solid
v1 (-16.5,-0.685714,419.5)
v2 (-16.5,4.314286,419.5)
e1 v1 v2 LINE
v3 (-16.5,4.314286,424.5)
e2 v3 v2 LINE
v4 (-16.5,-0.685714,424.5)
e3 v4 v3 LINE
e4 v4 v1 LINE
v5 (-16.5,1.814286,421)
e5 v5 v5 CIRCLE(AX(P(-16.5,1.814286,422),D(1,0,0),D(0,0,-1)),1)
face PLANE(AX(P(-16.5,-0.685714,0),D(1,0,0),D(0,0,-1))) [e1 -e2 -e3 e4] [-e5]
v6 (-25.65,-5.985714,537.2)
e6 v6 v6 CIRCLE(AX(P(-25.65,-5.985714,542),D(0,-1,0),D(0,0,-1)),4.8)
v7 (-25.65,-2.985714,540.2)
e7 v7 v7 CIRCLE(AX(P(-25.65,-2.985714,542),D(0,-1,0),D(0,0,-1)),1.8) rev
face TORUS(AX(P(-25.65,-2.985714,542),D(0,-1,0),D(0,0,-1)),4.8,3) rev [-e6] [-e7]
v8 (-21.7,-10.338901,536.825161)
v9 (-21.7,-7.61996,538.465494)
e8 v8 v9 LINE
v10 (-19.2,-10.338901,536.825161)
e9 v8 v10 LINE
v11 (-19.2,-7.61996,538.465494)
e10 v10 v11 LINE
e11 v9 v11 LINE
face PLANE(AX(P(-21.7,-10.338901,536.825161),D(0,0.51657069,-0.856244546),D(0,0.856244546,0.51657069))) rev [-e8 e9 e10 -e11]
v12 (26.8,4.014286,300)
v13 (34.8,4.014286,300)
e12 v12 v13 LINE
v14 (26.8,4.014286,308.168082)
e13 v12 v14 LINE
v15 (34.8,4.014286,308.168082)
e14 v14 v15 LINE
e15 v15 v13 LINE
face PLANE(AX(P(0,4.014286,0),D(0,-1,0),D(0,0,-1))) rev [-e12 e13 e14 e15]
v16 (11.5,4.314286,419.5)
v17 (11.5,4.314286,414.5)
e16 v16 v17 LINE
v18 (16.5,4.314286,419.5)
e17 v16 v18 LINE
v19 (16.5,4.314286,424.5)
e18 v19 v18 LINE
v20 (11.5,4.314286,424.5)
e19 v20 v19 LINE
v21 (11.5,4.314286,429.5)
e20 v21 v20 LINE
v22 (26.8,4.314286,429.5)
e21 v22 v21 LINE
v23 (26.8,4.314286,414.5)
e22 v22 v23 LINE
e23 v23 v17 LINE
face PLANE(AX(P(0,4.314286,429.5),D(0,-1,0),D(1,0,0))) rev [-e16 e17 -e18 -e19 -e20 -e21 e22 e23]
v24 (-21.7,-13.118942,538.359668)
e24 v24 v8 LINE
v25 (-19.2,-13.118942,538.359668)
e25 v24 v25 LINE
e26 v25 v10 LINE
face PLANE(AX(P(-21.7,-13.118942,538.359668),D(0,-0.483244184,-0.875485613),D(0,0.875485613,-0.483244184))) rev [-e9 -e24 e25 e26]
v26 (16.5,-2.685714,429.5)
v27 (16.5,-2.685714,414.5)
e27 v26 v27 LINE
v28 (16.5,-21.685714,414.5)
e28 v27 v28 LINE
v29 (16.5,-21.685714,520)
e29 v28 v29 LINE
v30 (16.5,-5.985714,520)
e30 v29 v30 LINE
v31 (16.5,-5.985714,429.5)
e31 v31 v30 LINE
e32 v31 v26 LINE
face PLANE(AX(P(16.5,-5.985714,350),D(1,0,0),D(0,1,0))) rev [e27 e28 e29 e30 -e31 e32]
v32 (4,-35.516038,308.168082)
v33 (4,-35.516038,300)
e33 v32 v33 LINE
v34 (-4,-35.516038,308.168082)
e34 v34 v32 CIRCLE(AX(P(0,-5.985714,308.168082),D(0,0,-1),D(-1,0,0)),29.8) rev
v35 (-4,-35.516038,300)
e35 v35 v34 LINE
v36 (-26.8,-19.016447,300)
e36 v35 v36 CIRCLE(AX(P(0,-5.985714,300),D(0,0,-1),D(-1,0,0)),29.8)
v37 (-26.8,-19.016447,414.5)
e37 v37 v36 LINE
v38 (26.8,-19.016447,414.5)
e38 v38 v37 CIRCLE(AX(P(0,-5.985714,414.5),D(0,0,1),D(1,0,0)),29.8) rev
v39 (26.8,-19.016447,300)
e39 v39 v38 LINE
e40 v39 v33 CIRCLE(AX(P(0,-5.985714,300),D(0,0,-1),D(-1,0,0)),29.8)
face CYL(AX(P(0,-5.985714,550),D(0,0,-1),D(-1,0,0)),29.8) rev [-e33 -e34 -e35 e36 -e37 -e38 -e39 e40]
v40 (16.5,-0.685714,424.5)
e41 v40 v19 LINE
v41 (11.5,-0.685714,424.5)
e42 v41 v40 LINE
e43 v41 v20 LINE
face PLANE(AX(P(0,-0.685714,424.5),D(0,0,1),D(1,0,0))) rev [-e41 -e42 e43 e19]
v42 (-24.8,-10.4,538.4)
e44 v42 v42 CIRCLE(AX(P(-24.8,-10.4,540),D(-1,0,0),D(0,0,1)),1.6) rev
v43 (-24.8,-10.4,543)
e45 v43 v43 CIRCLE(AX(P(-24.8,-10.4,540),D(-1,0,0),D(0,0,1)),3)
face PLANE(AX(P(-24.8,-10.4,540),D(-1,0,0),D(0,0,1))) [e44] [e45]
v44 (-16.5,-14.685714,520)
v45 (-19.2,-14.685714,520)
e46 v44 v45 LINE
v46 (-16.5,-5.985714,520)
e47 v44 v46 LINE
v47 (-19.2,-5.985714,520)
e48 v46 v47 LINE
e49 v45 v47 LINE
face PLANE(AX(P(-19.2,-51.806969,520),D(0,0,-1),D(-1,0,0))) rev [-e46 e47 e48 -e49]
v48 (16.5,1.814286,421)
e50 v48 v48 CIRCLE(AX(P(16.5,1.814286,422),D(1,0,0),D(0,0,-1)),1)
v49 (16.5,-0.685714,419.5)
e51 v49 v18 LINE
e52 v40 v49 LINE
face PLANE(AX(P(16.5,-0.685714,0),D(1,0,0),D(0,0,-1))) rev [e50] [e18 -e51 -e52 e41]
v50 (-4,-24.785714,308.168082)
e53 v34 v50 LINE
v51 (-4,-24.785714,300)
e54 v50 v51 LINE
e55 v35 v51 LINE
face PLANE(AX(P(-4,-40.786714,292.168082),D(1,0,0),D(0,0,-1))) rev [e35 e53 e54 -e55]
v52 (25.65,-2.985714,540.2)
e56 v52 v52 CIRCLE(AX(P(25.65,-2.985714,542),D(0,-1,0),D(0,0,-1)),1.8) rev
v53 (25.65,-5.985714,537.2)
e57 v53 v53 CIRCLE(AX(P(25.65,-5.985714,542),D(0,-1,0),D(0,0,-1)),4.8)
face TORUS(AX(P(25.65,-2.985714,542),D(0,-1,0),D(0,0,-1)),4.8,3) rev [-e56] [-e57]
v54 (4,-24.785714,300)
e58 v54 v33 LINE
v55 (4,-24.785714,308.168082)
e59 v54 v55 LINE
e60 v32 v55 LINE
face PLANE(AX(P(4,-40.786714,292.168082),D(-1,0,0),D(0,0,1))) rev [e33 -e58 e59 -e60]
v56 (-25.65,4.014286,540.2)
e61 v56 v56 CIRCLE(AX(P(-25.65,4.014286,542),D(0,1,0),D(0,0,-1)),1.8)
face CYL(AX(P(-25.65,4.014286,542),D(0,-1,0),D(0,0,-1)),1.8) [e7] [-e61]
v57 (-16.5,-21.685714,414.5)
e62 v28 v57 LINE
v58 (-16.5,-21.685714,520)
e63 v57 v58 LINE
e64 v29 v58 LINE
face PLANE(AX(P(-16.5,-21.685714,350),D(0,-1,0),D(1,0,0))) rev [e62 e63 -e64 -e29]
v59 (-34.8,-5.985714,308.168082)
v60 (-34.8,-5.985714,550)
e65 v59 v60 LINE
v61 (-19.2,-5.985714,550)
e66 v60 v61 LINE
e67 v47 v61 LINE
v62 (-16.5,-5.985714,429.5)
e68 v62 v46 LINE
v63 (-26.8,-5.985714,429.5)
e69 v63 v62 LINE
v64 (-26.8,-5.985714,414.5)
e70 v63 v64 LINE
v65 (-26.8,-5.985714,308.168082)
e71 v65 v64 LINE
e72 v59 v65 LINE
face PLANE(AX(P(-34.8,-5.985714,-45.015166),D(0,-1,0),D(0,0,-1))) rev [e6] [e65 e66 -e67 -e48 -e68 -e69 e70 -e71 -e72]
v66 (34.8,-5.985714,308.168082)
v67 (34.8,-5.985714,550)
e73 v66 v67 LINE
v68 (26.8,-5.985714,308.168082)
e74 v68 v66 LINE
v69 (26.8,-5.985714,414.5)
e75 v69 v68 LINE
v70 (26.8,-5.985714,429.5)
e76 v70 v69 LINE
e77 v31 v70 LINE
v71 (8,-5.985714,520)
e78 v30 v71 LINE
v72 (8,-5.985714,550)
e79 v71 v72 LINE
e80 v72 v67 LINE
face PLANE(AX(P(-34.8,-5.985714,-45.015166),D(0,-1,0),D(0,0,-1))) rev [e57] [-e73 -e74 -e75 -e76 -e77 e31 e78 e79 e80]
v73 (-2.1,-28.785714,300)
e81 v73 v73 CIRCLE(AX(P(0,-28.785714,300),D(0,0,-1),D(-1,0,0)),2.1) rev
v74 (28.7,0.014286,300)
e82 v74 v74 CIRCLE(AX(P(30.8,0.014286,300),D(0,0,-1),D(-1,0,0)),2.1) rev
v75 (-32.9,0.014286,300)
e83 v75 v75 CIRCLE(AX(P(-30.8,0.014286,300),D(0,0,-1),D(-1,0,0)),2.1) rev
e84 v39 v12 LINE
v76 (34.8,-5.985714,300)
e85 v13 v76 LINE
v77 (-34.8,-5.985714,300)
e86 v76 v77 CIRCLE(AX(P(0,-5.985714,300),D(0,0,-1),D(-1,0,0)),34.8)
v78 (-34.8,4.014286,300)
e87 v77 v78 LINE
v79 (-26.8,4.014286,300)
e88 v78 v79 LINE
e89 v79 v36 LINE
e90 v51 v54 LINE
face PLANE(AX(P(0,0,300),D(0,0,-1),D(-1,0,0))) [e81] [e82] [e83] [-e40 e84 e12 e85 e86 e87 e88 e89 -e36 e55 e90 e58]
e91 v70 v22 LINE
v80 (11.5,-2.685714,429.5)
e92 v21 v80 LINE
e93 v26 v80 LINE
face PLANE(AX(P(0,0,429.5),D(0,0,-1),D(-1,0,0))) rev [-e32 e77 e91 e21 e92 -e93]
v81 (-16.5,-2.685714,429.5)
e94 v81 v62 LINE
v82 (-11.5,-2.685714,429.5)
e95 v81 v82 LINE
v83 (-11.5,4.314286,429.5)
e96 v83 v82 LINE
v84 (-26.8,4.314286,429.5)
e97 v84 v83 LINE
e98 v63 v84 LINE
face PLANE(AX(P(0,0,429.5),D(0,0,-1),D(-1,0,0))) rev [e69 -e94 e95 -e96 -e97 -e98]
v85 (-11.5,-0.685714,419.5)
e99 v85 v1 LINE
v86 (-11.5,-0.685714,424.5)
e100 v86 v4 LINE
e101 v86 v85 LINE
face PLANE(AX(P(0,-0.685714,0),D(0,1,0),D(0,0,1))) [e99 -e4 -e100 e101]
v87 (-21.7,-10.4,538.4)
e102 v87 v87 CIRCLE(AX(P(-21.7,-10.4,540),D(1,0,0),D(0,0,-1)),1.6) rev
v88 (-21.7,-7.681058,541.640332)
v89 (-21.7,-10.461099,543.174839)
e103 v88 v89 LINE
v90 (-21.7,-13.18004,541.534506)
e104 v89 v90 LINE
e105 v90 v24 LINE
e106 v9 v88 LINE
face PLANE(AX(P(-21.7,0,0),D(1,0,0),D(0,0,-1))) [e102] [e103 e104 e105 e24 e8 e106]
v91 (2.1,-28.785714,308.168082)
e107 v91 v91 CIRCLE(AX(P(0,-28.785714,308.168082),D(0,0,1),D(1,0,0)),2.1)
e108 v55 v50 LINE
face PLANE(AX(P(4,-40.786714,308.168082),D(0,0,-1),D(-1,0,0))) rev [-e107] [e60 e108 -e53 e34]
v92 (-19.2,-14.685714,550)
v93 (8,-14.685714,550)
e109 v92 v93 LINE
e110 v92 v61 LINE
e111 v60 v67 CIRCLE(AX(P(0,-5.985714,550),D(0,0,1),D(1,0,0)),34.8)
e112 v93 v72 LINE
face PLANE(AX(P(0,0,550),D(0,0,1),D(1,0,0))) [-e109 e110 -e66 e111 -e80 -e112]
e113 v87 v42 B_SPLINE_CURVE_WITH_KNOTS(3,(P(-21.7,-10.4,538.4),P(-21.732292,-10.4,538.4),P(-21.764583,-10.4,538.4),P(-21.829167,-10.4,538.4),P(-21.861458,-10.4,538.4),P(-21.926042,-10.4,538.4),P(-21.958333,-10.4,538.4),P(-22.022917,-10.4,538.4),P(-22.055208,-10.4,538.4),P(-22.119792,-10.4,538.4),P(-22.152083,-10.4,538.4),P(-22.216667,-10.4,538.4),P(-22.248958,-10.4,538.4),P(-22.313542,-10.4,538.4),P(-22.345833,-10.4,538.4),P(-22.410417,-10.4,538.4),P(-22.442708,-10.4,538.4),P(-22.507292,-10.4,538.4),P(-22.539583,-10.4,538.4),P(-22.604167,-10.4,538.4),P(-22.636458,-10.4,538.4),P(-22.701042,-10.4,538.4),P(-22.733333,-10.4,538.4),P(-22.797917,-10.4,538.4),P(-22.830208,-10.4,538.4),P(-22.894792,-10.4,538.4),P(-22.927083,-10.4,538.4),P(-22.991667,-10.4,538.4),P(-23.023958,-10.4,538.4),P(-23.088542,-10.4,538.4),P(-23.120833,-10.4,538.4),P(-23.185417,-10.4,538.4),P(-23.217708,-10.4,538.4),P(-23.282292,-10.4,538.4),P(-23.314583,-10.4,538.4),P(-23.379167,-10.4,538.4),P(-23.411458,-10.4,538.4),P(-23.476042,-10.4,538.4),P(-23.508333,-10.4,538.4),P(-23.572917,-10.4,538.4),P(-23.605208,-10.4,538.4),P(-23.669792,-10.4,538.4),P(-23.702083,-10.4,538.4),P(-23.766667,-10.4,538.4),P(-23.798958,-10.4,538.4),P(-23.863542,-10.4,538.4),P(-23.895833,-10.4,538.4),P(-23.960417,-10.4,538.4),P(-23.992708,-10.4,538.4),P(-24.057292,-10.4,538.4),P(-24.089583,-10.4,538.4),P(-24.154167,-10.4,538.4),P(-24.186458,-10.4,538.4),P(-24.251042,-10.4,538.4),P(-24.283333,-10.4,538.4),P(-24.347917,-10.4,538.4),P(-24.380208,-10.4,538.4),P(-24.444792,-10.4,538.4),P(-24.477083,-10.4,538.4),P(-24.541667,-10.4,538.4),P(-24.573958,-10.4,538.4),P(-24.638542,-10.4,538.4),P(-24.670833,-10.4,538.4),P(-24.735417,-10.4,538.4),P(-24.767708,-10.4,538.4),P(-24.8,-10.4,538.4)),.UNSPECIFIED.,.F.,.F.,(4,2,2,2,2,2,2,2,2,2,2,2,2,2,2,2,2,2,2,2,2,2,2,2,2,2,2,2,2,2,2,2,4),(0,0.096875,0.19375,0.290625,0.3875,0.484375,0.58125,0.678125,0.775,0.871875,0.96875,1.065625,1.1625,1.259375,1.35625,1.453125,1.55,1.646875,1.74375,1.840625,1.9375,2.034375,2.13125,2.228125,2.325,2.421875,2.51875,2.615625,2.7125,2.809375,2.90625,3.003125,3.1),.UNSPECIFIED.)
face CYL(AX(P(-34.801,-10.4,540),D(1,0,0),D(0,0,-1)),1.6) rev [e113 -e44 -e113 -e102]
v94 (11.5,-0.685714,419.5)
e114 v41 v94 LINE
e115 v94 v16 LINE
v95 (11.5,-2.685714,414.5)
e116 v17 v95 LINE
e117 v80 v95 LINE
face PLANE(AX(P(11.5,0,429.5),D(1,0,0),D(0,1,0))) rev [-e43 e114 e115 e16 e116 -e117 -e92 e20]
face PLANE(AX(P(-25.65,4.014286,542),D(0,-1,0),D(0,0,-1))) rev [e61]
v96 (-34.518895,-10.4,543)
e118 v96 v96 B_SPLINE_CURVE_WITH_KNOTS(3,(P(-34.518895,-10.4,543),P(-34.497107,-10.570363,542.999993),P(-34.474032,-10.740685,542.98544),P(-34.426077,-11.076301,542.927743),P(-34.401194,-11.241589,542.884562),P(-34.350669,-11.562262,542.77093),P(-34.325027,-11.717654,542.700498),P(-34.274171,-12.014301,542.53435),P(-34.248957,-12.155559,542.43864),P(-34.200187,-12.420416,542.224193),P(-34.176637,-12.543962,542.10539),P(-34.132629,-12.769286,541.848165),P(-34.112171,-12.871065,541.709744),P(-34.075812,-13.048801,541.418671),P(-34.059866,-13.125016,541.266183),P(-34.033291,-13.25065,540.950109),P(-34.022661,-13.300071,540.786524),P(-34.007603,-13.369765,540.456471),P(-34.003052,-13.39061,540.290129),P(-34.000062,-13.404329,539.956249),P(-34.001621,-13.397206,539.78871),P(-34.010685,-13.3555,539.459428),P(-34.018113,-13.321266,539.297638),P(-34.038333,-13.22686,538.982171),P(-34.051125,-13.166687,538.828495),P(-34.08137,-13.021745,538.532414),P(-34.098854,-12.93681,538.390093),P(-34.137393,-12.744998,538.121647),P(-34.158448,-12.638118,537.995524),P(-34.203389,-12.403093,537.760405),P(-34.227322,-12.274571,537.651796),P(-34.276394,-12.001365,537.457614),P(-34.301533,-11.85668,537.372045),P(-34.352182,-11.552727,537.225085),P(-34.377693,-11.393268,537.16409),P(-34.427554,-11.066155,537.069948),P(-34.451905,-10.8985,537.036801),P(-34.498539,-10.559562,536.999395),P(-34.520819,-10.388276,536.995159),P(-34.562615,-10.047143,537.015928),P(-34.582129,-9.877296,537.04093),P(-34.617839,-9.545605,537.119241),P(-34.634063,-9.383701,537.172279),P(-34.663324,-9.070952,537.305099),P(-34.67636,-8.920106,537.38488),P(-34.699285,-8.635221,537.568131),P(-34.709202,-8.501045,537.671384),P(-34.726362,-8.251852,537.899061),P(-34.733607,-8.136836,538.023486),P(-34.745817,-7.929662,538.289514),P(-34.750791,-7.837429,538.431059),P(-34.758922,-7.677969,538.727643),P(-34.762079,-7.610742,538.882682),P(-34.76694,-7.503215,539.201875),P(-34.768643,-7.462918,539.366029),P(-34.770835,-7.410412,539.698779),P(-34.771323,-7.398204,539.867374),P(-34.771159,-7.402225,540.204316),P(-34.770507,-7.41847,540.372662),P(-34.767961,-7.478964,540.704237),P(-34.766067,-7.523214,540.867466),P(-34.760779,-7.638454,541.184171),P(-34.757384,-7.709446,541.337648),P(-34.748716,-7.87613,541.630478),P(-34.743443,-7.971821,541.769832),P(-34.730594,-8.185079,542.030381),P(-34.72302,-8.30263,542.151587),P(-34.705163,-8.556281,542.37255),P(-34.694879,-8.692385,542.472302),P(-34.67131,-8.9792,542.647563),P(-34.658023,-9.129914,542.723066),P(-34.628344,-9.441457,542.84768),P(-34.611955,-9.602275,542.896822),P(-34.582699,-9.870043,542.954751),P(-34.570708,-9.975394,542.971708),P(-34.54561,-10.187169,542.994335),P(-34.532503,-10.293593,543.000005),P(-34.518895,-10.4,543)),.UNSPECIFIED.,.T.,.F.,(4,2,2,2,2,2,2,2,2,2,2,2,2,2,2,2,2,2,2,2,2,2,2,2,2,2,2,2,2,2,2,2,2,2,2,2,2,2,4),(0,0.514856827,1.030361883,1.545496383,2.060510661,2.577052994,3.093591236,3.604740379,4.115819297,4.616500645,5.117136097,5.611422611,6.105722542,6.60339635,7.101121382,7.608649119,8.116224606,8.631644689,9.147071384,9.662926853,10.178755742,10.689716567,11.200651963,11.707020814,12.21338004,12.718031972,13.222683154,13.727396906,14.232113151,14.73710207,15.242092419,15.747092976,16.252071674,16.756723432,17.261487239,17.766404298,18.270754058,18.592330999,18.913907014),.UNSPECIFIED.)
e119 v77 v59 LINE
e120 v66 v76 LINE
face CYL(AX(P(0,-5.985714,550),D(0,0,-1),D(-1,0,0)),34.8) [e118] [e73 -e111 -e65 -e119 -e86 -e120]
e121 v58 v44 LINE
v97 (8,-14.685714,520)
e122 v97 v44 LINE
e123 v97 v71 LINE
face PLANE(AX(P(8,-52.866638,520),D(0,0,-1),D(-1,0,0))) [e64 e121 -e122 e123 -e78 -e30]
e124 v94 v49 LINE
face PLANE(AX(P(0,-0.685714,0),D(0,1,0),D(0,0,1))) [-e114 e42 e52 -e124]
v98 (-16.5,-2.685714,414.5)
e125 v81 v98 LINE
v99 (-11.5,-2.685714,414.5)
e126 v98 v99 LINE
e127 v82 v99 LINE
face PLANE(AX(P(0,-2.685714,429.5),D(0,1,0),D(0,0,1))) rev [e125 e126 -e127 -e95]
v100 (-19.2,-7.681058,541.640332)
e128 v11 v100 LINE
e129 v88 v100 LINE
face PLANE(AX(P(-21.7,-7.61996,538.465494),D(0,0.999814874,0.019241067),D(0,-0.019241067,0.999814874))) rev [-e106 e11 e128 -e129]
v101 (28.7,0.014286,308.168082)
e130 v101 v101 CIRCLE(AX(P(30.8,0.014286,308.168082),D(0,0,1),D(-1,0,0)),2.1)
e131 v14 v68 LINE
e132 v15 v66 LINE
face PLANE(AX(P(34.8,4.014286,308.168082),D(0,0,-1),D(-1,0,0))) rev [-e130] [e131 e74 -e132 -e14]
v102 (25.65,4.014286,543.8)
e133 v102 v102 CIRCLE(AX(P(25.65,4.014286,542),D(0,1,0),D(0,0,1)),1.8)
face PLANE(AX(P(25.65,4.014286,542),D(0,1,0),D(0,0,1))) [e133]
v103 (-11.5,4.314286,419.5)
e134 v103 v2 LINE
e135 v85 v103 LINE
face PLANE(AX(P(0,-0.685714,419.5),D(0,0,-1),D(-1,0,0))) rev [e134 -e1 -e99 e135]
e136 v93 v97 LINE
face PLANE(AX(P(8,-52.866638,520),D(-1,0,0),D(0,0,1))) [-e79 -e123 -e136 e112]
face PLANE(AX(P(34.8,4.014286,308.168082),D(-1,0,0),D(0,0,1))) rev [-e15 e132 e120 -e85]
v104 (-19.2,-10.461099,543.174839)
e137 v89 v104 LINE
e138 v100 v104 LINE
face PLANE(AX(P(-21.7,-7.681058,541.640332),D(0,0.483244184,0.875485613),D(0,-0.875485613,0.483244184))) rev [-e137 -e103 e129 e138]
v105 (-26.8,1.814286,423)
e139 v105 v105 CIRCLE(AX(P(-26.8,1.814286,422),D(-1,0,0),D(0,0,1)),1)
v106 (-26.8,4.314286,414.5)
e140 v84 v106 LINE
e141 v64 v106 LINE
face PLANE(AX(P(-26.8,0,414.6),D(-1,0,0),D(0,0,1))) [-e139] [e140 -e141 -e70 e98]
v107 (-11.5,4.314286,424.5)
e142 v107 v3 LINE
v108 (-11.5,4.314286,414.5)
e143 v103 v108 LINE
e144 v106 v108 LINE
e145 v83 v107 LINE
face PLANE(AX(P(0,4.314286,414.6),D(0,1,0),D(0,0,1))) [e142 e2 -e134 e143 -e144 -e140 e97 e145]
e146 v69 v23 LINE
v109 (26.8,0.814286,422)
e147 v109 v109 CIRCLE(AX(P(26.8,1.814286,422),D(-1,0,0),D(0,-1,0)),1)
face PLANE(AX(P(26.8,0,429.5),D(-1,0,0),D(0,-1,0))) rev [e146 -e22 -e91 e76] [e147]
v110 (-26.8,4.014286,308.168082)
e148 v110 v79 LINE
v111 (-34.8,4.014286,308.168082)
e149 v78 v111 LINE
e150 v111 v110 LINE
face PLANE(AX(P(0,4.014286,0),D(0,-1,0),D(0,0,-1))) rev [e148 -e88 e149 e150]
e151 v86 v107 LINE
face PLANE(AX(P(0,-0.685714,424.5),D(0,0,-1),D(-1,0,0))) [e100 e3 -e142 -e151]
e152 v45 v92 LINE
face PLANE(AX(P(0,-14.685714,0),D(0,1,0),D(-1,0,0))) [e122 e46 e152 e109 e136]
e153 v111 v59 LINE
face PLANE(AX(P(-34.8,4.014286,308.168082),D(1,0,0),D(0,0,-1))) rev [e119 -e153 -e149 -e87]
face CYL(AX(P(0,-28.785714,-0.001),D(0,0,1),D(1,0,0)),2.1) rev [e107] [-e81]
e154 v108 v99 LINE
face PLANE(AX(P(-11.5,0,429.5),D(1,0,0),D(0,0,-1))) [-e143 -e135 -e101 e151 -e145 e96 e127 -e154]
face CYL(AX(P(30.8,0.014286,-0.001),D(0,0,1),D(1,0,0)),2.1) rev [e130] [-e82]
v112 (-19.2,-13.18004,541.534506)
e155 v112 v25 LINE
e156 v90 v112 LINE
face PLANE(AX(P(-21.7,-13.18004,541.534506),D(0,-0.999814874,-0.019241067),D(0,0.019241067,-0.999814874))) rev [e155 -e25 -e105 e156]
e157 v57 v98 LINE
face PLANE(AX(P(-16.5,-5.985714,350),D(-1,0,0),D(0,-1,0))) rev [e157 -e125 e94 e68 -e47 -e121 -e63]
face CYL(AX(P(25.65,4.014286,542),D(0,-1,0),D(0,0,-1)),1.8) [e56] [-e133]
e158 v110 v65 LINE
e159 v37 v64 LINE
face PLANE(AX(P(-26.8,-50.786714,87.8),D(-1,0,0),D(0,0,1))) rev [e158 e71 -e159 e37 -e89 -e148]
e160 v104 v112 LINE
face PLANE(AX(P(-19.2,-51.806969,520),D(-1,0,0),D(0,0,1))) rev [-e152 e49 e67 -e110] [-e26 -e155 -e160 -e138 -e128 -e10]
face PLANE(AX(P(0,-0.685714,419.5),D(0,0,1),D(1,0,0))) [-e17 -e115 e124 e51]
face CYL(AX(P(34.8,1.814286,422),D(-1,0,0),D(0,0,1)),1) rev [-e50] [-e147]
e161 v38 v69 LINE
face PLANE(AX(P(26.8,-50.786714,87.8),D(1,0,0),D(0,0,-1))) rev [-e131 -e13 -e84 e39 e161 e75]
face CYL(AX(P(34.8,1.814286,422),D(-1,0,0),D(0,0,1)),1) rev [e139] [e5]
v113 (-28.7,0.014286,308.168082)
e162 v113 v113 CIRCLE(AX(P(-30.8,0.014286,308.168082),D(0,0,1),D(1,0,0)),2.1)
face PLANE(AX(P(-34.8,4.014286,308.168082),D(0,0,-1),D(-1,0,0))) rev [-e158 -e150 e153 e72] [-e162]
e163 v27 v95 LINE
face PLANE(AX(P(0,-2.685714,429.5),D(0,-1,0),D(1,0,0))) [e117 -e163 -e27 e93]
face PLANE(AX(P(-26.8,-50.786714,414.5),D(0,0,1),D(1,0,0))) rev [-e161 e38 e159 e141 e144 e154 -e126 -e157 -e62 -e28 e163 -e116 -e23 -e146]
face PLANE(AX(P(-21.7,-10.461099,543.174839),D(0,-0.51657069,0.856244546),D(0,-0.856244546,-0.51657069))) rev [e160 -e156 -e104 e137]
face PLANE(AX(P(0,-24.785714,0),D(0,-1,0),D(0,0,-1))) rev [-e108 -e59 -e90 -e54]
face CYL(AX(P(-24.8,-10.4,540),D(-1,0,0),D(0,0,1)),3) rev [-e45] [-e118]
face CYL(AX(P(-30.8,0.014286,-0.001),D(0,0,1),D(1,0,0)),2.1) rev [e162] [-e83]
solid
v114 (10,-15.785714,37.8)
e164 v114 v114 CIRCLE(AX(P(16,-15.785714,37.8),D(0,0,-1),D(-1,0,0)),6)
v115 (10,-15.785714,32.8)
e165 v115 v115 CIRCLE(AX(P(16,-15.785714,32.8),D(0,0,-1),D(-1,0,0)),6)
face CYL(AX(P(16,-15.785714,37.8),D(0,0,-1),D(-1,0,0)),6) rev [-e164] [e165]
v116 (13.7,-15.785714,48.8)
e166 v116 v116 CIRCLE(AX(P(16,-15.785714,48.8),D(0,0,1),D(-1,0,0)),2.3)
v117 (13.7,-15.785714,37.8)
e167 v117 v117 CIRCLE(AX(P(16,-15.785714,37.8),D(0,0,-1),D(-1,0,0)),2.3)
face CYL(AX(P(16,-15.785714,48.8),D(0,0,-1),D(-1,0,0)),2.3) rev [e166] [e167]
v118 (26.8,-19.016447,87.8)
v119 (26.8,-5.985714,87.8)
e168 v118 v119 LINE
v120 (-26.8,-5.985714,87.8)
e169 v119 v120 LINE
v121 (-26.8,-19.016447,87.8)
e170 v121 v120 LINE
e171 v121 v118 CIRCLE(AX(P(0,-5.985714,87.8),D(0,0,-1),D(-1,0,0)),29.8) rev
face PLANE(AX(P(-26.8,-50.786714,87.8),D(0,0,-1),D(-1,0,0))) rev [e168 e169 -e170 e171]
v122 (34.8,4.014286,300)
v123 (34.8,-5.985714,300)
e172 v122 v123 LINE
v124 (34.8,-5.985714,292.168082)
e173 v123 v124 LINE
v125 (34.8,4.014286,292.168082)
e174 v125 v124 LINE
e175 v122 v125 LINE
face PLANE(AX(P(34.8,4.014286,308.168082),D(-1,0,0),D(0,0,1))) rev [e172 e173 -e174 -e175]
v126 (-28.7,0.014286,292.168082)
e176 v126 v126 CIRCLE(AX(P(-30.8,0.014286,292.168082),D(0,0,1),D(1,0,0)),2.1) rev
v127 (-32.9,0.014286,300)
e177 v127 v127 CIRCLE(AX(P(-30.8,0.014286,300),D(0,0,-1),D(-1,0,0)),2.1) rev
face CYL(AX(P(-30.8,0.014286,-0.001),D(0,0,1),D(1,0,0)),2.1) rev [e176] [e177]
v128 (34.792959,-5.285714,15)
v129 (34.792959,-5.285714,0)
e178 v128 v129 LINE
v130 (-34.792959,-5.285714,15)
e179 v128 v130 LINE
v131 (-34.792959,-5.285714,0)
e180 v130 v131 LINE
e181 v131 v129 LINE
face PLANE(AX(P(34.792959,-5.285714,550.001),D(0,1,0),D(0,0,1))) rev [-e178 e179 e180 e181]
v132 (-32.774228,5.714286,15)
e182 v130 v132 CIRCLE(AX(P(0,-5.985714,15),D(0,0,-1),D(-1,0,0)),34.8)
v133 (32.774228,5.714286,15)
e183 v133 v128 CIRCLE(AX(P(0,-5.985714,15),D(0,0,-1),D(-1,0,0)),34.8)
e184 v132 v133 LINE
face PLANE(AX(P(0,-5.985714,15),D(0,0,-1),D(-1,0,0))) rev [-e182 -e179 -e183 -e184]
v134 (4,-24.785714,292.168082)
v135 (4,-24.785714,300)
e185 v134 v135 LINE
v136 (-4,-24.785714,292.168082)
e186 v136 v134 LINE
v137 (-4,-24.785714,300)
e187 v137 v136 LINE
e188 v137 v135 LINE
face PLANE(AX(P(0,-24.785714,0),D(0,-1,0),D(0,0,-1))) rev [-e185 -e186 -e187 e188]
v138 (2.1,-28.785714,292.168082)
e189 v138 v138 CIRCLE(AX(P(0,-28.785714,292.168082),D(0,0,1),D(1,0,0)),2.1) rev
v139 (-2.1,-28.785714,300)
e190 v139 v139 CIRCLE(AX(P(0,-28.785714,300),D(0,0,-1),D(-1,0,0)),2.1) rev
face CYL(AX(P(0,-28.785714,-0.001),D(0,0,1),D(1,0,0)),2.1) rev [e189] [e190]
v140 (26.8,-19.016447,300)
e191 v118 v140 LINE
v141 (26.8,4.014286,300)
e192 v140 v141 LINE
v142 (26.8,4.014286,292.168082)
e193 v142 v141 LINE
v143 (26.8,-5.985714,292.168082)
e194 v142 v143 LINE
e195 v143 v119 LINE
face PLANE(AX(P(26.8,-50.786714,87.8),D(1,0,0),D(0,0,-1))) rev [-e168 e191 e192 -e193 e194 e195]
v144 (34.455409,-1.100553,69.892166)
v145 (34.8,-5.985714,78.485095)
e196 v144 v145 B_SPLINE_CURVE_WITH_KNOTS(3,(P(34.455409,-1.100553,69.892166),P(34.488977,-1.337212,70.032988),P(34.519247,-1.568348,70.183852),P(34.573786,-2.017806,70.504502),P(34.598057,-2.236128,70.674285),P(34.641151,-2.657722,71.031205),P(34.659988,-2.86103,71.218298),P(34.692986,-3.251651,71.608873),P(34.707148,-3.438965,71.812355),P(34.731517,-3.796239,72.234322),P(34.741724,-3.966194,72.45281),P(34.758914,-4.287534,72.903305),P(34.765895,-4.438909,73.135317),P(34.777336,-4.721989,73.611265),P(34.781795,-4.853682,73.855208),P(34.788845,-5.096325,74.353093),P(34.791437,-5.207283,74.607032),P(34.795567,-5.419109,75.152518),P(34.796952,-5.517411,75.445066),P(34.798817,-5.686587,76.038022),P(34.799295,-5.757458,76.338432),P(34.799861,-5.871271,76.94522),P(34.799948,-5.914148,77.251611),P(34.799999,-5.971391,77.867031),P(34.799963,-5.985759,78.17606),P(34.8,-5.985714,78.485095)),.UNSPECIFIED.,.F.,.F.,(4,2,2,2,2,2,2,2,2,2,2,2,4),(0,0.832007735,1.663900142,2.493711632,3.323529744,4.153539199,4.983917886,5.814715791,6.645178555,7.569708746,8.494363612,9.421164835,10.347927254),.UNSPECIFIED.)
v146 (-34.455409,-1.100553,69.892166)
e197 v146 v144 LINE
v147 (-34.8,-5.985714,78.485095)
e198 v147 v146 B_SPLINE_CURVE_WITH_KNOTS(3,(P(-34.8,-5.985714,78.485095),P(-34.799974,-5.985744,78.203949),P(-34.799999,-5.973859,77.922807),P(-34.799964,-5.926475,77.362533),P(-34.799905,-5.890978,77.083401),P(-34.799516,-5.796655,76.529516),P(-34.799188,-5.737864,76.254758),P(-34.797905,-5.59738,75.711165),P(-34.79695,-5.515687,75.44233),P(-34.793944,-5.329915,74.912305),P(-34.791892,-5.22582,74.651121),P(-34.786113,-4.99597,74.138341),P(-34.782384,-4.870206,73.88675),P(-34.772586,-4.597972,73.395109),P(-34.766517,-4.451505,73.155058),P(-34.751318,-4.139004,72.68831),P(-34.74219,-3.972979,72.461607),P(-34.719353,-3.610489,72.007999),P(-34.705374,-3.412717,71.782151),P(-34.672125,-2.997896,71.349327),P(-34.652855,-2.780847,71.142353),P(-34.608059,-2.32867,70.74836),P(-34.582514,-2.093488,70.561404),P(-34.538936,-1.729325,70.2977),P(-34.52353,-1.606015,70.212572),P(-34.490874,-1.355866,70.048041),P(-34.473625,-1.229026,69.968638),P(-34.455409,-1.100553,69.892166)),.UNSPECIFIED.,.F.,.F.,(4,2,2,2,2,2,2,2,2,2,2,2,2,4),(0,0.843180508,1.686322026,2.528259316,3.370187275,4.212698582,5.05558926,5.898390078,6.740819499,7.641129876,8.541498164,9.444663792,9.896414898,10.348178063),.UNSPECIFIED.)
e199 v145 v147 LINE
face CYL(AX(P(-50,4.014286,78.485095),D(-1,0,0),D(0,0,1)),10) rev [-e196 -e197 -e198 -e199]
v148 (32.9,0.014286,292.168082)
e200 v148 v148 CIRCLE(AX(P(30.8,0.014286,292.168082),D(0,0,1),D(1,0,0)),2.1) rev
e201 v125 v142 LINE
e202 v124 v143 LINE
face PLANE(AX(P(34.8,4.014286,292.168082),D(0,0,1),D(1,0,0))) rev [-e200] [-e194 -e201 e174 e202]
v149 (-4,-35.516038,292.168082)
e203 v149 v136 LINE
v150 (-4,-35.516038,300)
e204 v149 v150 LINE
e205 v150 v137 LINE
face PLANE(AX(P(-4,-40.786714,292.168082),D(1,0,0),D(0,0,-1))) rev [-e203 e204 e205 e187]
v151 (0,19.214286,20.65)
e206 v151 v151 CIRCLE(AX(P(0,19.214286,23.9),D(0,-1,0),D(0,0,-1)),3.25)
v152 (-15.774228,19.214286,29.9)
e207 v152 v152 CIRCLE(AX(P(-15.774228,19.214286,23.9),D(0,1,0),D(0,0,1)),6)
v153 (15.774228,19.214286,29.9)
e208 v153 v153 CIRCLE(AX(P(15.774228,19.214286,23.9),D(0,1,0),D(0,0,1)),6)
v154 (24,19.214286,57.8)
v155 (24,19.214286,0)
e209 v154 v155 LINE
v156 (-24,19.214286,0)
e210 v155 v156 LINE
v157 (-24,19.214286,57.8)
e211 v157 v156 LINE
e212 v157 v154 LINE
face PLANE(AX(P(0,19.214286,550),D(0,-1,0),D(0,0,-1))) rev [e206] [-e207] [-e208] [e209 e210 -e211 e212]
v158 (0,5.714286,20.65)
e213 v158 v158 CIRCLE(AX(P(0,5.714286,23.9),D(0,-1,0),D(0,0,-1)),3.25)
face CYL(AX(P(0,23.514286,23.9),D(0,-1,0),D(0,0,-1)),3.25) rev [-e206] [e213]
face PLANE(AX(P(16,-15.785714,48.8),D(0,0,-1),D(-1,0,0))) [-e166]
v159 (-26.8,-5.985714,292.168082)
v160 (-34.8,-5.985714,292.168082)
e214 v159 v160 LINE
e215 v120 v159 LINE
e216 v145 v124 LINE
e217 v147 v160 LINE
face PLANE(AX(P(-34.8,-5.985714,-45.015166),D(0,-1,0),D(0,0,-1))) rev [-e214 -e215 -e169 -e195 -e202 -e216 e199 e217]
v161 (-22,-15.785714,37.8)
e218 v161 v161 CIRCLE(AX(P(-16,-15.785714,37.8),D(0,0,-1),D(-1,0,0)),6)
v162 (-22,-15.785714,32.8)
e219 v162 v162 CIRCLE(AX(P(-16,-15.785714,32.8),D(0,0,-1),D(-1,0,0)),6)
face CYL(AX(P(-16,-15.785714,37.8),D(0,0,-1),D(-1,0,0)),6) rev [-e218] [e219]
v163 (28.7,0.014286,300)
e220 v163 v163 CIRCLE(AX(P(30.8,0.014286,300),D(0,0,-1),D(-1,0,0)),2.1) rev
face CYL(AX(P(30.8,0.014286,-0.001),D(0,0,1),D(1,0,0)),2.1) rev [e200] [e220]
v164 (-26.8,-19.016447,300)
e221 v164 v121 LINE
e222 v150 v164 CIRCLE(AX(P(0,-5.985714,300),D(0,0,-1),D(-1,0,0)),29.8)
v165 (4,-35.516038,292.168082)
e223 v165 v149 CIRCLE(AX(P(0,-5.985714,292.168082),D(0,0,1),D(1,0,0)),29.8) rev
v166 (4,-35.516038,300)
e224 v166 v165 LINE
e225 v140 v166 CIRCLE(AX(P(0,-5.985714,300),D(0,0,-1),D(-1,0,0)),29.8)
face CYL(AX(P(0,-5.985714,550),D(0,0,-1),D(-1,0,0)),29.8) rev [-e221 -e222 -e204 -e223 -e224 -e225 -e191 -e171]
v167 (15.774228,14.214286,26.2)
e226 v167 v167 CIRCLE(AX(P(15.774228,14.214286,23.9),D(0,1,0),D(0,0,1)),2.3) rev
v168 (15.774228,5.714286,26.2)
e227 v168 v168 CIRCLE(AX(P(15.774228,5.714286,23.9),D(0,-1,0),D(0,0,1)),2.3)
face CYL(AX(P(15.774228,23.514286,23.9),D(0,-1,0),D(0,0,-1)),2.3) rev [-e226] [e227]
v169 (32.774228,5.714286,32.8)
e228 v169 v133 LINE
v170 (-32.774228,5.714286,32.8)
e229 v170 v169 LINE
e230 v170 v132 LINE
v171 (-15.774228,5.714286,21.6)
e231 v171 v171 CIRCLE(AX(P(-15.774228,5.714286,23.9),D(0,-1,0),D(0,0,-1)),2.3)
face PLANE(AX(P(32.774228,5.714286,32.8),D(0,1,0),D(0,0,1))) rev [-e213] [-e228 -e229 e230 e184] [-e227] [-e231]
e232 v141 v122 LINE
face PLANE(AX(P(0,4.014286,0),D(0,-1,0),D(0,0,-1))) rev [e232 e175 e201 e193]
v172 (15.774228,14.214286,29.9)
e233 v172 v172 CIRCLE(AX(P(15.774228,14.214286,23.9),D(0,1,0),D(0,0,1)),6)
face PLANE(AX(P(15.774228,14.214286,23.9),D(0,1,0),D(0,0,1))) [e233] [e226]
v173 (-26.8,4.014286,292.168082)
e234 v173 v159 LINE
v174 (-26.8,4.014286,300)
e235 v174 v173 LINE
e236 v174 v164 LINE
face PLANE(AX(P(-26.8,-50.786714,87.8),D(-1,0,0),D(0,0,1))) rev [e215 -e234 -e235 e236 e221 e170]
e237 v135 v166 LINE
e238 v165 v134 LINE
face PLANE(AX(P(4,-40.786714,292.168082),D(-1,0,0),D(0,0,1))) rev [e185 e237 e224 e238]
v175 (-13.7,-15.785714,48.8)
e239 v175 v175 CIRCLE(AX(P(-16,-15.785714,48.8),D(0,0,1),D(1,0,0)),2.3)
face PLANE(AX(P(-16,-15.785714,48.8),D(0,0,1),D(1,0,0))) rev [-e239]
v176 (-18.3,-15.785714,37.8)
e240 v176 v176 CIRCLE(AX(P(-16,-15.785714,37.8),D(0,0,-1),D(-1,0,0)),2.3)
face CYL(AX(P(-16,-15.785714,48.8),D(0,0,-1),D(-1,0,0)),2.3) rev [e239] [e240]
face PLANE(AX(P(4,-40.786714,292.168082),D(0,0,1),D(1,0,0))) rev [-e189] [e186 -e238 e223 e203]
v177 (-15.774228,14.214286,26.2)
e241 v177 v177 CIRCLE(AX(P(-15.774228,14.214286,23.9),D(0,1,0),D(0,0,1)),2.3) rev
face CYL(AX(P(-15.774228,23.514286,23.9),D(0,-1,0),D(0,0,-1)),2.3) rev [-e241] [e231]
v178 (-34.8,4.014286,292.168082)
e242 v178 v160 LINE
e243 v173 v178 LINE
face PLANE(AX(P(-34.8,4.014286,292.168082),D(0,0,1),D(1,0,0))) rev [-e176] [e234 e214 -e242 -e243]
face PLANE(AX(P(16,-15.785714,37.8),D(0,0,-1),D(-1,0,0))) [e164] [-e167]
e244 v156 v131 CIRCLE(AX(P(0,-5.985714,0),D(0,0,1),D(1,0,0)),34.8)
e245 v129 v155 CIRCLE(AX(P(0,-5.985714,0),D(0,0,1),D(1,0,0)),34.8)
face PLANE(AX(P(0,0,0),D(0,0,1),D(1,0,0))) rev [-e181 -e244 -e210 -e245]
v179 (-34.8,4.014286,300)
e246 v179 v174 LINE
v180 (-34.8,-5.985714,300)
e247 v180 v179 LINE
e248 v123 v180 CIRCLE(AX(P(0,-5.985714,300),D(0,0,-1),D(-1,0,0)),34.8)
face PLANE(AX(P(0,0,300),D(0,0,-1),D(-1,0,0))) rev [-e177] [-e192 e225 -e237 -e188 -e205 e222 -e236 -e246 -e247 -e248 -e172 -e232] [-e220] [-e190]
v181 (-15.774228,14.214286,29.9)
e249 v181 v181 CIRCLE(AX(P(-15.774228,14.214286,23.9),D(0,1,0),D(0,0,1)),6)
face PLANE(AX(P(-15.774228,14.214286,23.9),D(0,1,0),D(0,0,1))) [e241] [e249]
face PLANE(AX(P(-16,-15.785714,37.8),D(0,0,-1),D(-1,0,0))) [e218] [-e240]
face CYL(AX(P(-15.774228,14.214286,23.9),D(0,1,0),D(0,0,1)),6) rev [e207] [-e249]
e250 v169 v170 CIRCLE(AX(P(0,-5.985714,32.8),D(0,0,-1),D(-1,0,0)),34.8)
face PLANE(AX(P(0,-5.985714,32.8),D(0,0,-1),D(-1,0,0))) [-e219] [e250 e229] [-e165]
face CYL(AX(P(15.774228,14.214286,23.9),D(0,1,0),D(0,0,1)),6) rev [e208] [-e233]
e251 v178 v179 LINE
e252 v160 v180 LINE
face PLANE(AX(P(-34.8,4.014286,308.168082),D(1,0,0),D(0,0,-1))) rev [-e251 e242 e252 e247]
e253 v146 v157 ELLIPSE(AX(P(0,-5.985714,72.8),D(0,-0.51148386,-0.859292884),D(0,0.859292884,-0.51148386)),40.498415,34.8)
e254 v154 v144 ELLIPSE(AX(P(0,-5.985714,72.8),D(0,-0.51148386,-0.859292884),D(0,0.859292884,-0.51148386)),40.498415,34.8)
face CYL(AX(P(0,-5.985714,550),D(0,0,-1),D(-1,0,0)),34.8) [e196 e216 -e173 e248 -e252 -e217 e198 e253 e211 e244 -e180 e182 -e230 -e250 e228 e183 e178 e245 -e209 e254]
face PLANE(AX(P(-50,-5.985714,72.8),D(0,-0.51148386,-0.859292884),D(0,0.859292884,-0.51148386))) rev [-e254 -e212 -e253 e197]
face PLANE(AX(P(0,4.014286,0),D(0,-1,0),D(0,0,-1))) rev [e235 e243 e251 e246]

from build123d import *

# Parameters (mm, degrees)
F_1000MM_DEPTH           = 550
F_45MM_46MM_DEPTH        = 17.8
CUT_EXTRUDE_2_REACH      = 554.607
SKETCH_4_R               = 3.25
SKETCH_4_R_2             = 2.3
F_6_5MM_5MM_DEPTH        = 17.8
SKETCH_10_R              = 2.3
DEEP16MM_DEPTH           = 16
SKETCH_16_R              = 6
F_5MM_DEPTH              = 5
SKETCH_17_R              = 6
F_5MM_2_DEPTH            = 5
CUT_EXTRUDE_START        = -477.2
CUT_EXTRUDE_7_DEPTH      = 477.2
F_69_6MM_DEPTH           = 50
FILLET_1_R               = 10
SKETCH_22_W              = 33
SKETCH_22_H              = 15.7
CUT_EXTRUDE_9_DEPTH      = 200
CUT_EXTRUDE_START_2      = 87.8
CUT_EXTRUDE_12_DEPTH     = 326.7
SKETCH5_W                = 10.3
SKETCH5_H                = 10.3
BOSS_EXTRUDE1_DEPTH      = 0.1
SKETCH11_W               = 2.7
SKETCH11_H               = 30
CUT_EXTRUDE5_DEPTH       = 15.7
SKETCH12_W               = 8.5
SKETCH12_H               = 30
BOSS_EXTRUDE2_DEPTH      = 15.7
SKETCH14_W               = 27.2
SKETCH14_H               = 30
BOSS_EXTRUDE3_DEPTH      = 7
SKETCH19_W               = 8
SKETCH19_H               = 16
BOSS_EXTRUDE5_DEPTH      = 10
CUT_EXTRUDE9_REACH       = 314.797
SKETCH20_R               = 2.1
BOSS_EXTRUDE7_REACH      = 554.854
BOSS_EXTRUDE7_END_RADIUS = 29.8
SKETCH22_W               = 8
SKETCH22_H               = 16
CUT_EXTRUDE10_REACH      = 314.797
SKETCH23_R               = 2.1
SKETCH_32_R              = 1.8
BOSS_EXTRUDE9_DEPTH      = 10
FILLET4_R                = 3
CUT_EXTRUDE11_REACH      = 556.148
CUT_EXTRUDE11_END_RADIUS = 34.8
SKETCH13_R               = 1.6
CUT_EXTRUDE12_DEPTH      = 2.5
SKETCH25_R               = 3
CUT_EXTRUDE13_DEPTH      = 10
SKETCH26_W               = 5
SKETCH26_H               = 7
BOSS_EXTRUDE10_DEPTH     = 15
SKETCH27_W               = 5
SKETCH27_H               = 5
CUT_EXTRUDE14_DEPTH      = 5
SKETCH28_R               = 1
CUT_EXTRUDE15_DEPTH      = 555.93966755


# Read off the part's stored shape, not the designer's step: 切除-拉伸12
with BuildPart() as part:
    # 草图1 → 1000mm (new body)
    with BuildSketch(Plane.XY):
        with BuildLine():
            Line((24, 19.214285714), (-24, 19.214285714))
            ThreePointArc((-24, 19.214285714), (0, -40.785714286), (24, 19.214285714))
        make_face()
    extrude(amount=F_1000MM_DEPTH)

    # 草图2 → 45mm到46mm (cut)
    with BuildSketch(Plane(origin=(0, 0, 15), x_dir=(-1, 0, 0), z_dir=(0, 0, -1))):
        with BuildLine():
            Line((-32.77422768, 5.714285714), (32.77422768, 5.714285714))
            ThreePointArc((32.77422768, 5.714285714), (0, -40.785714286), (-32.77422768, 5.714285714))
        make_face()
    extrude(amount=-F_45MM_46MM_DEPTH, mode=Mode.SUBTRACT)

    # 草图3 → 切除-拉伸2 (cut, up to next)
    with BuildSketch(Plane(origin=(0, 0, 0), x_dir=(-1, 0, 0), z_dir=(0, 0, -1)), mode=Mode.PRIVATE) as cut_extrude_2_sk1:
        with BuildLine():
            Line((-34.792959058, -5.285714286), (34.792959058, -5.285714286))
            ThreePointArc((34.792959058, -5.285714286), (0, -40.785714286), (-34.792959058, -5.285714286))
        make_face()
    cut_extrude_2_tool1 = extrude(cut_extrude_2_sk1.sketch, amount=-CUT_EXTRUDE_2_REACH, mode=Mode.PRIVATE) & part.part
    add(cut_extrude_2_tool1.solids().sort_by_distance((0, -20.377758, 0))[0], mode=Mode.SUBTRACT)

    # 草图4 → 6.5mm&5mm (cut)
    with BuildSketch(Plane.XZ.offset(-5.714285714)):
        with Locations(Location((0, 23.9, 0), (0, 0, 270))):
            Circle(SKETCH_4_R)
        with Locations(Location((-15.77422768, 23.9, 0), (0, 0, 270))):
            Circle(SKETCH_4_R_2)
        with Locations(Location((15.77422768, 23.9, 0), (0, 0, 270))):
            Circle(SKETCH_4_R_2)
    extrude(amount=-F_6_5MM_5MM_DEPTH, mode=Mode.SUBTRACT)

    # 草图10 → 圆孔deep16mm (cut)
    with BuildSketch(Plane.XY.offset(32.8)):
        with Locations((-16, -15.785714286)):
            Circle(SKETCH_10_R)
        with Locations(Location((16, -15.785714286, 0), (0, 0, 180))):
            Circle(SKETCH_10_R)
    extrude(amount=DEEP16MM_DEPTH, mode=Mode.SUBTRACT)

    # 草图16 → 5mm (cut)
    with BuildSketch(Plane(origin=(0, 19.214285714, 0), x_dir=(1, 0, 0), z_dir=(0, 1, 0))):
        with Locations(Location((-15.77422768, -23.9, 0), (0, 0, 270))):
            Circle(SKETCH_16_R)
        with Locations(Location((15.77422768, -23.9, 0), (0, 0, 270))):
            Circle(SKETCH_16_R)
    extrude(amount=-F_5MM_DEPTH, mode=Mode.SUBTRACT)

    # 草图17 → 5mm 2 (cut)
    with BuildSketch(Plane(origin=(0, 0, 32.8), x_dir=(-1, 0, 0), z_dir=(0, 0, -1))):
        with Locations((-16, -15.785714286)):
            Circle(SKETCH_17_R)
        with Locations((16, -15.785714286)):
            Circle(SKETCH_17_R)
    extrude(amount=-F_5MM_2_DEPTH, mode=Mode.SUBTRACT)

    # 草图19 → 切除-拉伸7 (cut)
    with BuildSketch(Plane.XY.offset(550).offset(CUT_EXTRUDE_START)):
        with BuildLine():
            Line((-34.8, -5.985714286), (34.8, -5.985714286))
            ThreePointArc((34.8, -5.985714286), (0, 28.814285714), (-34.8, -5.985714286))
        make_face()
    extrude(amount=CUT_EXTRUDE_7_DEPTH, mode=Mode.SUBTRACT)

    # 草图20 → 宽69.6mm (cut, symmetric)
    with BuildSketch(Plane(origin=(0, 0, 0), x_dir=(0, 0, -1), z_dir=(1, 0, 0))):
        Polygon((-72.8, -5.985714286), (-57.8, 19.214285714), (-72.8, 19.214285714), align=None)
    extrude(amount=F_69_6MM_DEPTH, both=True, mode=Mode.SUBTRACT)

    # 圆角1
    fillet_1_edges = [part.edges().sort_by_distance(p)[0] for p in [
        (0, -5.985714286, 72.8),
    ]]
    fillet(fillet_1_edges, radius=FILLET_1_R)

    # 草图22 → 切除-拉伸9 (cut)
    with BuildSketch(Plane.XY.offset(550)):
        with Locations((0, -13.835714286)):
            Rectangle(SKETCH_22_W, SKETCH_22_H)
    extrude(amount=-CUT_EXTRUDE_9_DEPTH, mode=Mode.SUBTRACT)

    # 切除-拉伸12 outline → 切除-拉伸12 (cut)
    with BuildSketch(Plane.XY.offset(CUT_EXTRUDE_START_2)):
        with BuildLine():
            Line((-26.8, -5.985714286), (-26.8, -19.016447189))
            ThreePointArc((-26.8, -19.016447189), (0, -35.785714286), (26.8, -19.016447189))
            Line((26.8, -19.016447189), (26.8, -5.985714286))
            Line((26.8, -5.985714286), (-26.8, -5.985714286))
        make_face()
    extrude(amount=CUT_EXTRUDE_12_DEPTH, mode=Mode.SUBTRACT)

    # Sketch5 → Boss-Extrude1 (add)
    with BuildSketch(Plane(origin=(0, 0, 414.5), x_dir=(-1, 0, 0), z_dir=(0, 0, -1))):
        with Locations((21.65, -0.835714286)):
            Rectangle(SKETCH5_W, SKETCH5_H)
    extrude(amount=-BOSS_EXTRUDE1_DEPTH)


with BuildPart() as body_2:
    # Split1: the piece on the far side of the plane
    add(part.part)
    split(bisect_by=Plane(origin=(0, 0, 300), x_dir=(-1, 0, 0), z_dir=(0, 0, -1)), keep=Keep.BOTTOM)

    # Sketch11 → Cut-Extrude5 (cut)
    with BuildSketch(Plane(origin=(0, -5.985714286, 0), x_dir=(1, 0, 0), z_dir=(0, 1, 0))):
        with Locations((-17.85, -535)):
            Rectangle(SKETCH11_W, SKETCH11_H)
    extrude(amount=-CUT_EXTRUDE5_DEPTH, mode=Mode.SUBTRACT)

    # Sketch12 → Boss-Extrude2 (add)
    with BuildSketch(Plane(origin=(0, -5.985714286, 0), x_dir=(1, 0, 0), z_dir=(0, 1, 0))):
        with Locations((12.25, -535)):
            Rectangle(SKETCH12_W, SKETCH12_H)
    extrude(amount=-BOSS_EXTRUDE2_DEPTH)

    # Sketch14 → Boss-Extrude3 (add)
    with BuildSketch(Plane(origin=(0, -21.685714286, 0), x_dir=(1, 0, 0), z_dir=(0, 1, 0))):
        with Locations((-5.6, -535)):
            Rectangle(SKETCH14_W, SKETCH14_H)
    extrude(amount=BOSS_EXTRUDE3_DEPTH)


with BuildPart() as part_1:
    add(part.part)

    # Split1
    split(bisect_by=Plane(origin=(0, 0, 300), x_dir=(-1, 0, 0), z_dir=(0, 0, -1)), keep=Keep.TOP)

    add(body_2.part)  # Boss-Extrude5 merges body 2
    # Sketch19 → Boss-Extrude5 (add)
    with BuildSketch(Plane(origin=(0, -5.985714286, 0), x_dir=(1, 0, 0), z_dir=(0, 1, 0))):
        with Locations((-30.8, -300.168081581)):
            Rectangle(SKETCH19_W, SKETCH19_H)
        with Locations((30.8, -300.168081581)):
            Rectangle(SKETCH19_W, SKETCH19_H)
    extrude(amount=BOSS_EXTRUDE5_DEPTH)

    # Sketch20 → Cut-Extrude9 (cut, up to next)
    with BuildSketch(Plane.XY.offset(308.168081581), mode=Mode.PRIVATE) as cut_extrude9_sk1:
        with Locations((-30.8, 0.014285714)):
            Circle(SKETCH20_R)
    cut_extrude9_tool1 = extrude(cut_extrude9_sk1.sketch, amount=-CUT_EXTRUDE9_REACH, mode=Mode.PRIVATE) & part_1.part
    # Sketch20 → Cut-Extrude9 (cut, up to next)
    with BuildSketch(Plane.XY.offset(308.168081581), mode=Mode.PRIVATE) as cut_extrude9_sk2:
        with Locations((30.8, 0.014285714)):
            Circle(SKETCH20_R)
    cut_extrude9_tool2 = extrude(cut_extrude9_sk2.sketch, amount=-CUT_EXTRUDE9_REACH, mode=Mode.PRIVATE) & part_1.part
    add(cut_extrude9_tool1.solids().sort_by_distance((-30.8, 0.014286, 308.168082))[0], mode=Mode.SUBTRACT)
    add(cut_extrude9_tool2.solids().sort_by_distance((30.8, 0.014286, 308.168082))[0], mode=Mode.SUBTRACT)

    # Boss-Extrude7: up to this cylinder (the profile starts inside it)
    boss_extrude7_end = Plane(origin=(0, -5.985714286, 300.168082), z_dir=(0, 0, -1)) * Cylinder(BOSS_EXTRUDE7_END_RADIUS, 1170.308, mode=Mode.PRIVATE)
    # Sketch22 → Boss-Extrude7 (add, up to the surface)
    with BuildSketch(Plane(origin=(0, -24.785714286, 0), x_dir=(-1, 0, 0), z_dir=(0, -1, 0)), mode=Mode.PRIVATE) as boss_extrude7_sk1:
        with Locations((0, -300.168081581)):
            Rectangle(SKETCH22_W, SKETCH22_H)
    boss_extrude7_tool1 = extrude(boss_extrude7_sk1.sketch, amount=BOSS_EXTRUDE7_REACH, mode=Mode.PRIVATE) & boss_extrude7_end
    add(boss_extrude7_tool1.solids().sort_by_distance((0, -24.785714, 300.168082))[0])

    # Sketch23 → Cut-Extrude10 (cut, up to next)
    with BuildSketch(Plane.XY.offset(308.168081581), mode=Mode.PRIVATE) as cut_extrude10_sk1:
        with Locations((0, -28.785714286)):
            Circle(SKETCH23_R)
    cut_extrude10_tool1 = extrude(cut_extrude10_sk1.sketch, amount=-CUT_EXTRUDE10_REACH, mode=Mode.PRIVATE) & part_1.part
    add(cut_extrude10_tool1.solids().sort_by_distance((0, -28.785714, 308.168082))[0], mode=Mode.SUBTRACT)


with BuildPart() as body_2_2:
    # Split6: the piece on the far side of the plane
    add(part_1.part)
    split(bisect_by=Plane(origin=(0, 0, 300), x_dir=(-1, 0, 0), z_dir=(0, 0, -1)), keep=Keep.BOTTOM)

    # 草图32 → Boss-Extrude9 (add)
    with BuildSketch(Plane(origin=(0, -5.985714286, 0), x_dir=(1, 0, 0), z_dir=(0, 1, 0))):
        with Locations(Location((25.65, -542, 0), (0, 0, 90))):
            Circle(SKETCH_32_R)
        with Locations(Location((-25.65, -542, 0), (0, 0, 90))):
            Circle(SKETCH_32_R)
    extrude(amount=BOSS_EXTRUDE9_DEPTH)

    # Fillet4
    fillet4_edges = [body_2_2.edges().sort_by_distance(p)[0] for p in [
        (25.65, -5.985714286, 543.8),
        (-25.65, -5.985714286, 543.8),
    ]]
    fillet(fillet4_edges, radius=FILLET4_R)

    # Cut-Extrude11: up to this cylinder (the profile starts inside it)
    cut_extrude11_end = Plane(origin=(0, -5.985714286, 540), z_dir=(0, 0, -1)) * Cylinder(CUT_EXTRUDE11_END_RADIUS, 1182.896, mode=Mode.PRIVATE)
    # Sketch13 → Cut-Extrude11 (cut, up to the surface)
    with BuildSketch(Plane(origin=(-19.2, 0, 0), x_dir=(0, 0, -1), z_dir=(1, 0, 0)), mode=Mode.PRIVATE) as cut_extrude11_sk1:
        with Locations((-540, -10.4)):
            Circle(SKETCH13_R)
    cut_extrude11_tool1 = extrude(cut_extrude11_sk1.sketch, amount=-CUT_EXTRUDE11_REACH, mode=Mode.PRIVATE) & cut_extrude11_end
    add(cut_extrude11_tool1.solids().sort_by_distance((-19.2, -10.4, 540))[0], mode=Mode.SUBTRACT)

    # Sketch24 → Cut-Extrude12 (cut)
    with BuildSketch(Plane(origin=(-19.2, 0, 0), x_dir=(0, 0, -1), z_dir=(1, 0, 0))):
        Polygon((-538.359667753, -13.118941605), (-536.825161375, -10.338901406), (-538.465493622, -7.619959801), (-541.640332247, -7.681058395), (-543.174838625, -10.461098594), (-541.534506378, -13.180040199), align=None)
    extrude(amount=-CUT_EXTRUDE12_DEPTH, mode=Mode.SUBTRACT)

    # Sketch25 → Cut-Extrude13 (cut)
    with BuildSketch(Plane.ZY.offset(34.8)):
        with Locations((540, -10.4)):
            Circle(SKETCH25_R)
    extrude(amount=-CUT_EXTRUDE13_DEPTH, mode=Mode.SUBTRACT)

    # Sketch26 → Boss-Extrude10 (add)
    with BuildSketch(Plane(origin=(0, 0, 414.5), x_dir=(-1, 0, 0), z_dir=(0, 0, -1))):
        Polygon((16.5, -5.985714286), (26.8, -5.985714286), (26.8, 4.314285714), (16.5, 4.314285714), (16.5, -2.685714286), align=None)
        with Locations((14, 0.814285714)):
            Rectangle(SKETCH26_W, SKETCH26_H)
        with Locations((-14, 0.814285714)):
            Rectangle(SKETCH26_W, SKETCH26_H)
        Polygon((-16.5, -2.685714286), (-16.5, 4.314285714), (-26.8, 4.314285714), (-26.8, -5.985714286), (-16.5, -5.985714286), align=None)
    extrude(amount=-BOSS_EXTRUDE10_DEPTH)

    # Sketch27 → Cut-Extrude14 (cut)
    with BuildSketch(Plane(origin=(0, 4.314285714, 0), x_dir=(1, 0, 0), z_dir=(0, 1, 0))):
        Polygon((-11.5, -424.5), (-11.5, -422), (-11.5, -419.5), (-16.5, -419.5), (-16.5, -424.5), align=None)
        with Locations((14, -422)):
            Rectangle(SKETCH27_W, SKETCH27_H)
    extrude(amount=-CUT_EXTRUDE14_DEPTH, mode=Mode.SUBTRACT)

    # Sketch28 → Cut-Extrude15 (cut, through all)
    with BuildSketch(Plane.ZY.offset(26.8)):
        with Locations((422, 1.814285714)):
            Circle(SKETCH28_R)
    extrude(amount=-CUT_EXTRUDE15_DEPTH, mode=Mode.SUBTRACT)


with BuildPart() as part_2:
    add(part_1.part)

    # Split6
    split(bisect_by=Plane(origin=(0, 0, 300), x_dir=(-1, 0, 0), z_dir=(0, 0, -1)), keep=Keep.TOP)


solid = Compound([body_2_2.part, part_2.part])
